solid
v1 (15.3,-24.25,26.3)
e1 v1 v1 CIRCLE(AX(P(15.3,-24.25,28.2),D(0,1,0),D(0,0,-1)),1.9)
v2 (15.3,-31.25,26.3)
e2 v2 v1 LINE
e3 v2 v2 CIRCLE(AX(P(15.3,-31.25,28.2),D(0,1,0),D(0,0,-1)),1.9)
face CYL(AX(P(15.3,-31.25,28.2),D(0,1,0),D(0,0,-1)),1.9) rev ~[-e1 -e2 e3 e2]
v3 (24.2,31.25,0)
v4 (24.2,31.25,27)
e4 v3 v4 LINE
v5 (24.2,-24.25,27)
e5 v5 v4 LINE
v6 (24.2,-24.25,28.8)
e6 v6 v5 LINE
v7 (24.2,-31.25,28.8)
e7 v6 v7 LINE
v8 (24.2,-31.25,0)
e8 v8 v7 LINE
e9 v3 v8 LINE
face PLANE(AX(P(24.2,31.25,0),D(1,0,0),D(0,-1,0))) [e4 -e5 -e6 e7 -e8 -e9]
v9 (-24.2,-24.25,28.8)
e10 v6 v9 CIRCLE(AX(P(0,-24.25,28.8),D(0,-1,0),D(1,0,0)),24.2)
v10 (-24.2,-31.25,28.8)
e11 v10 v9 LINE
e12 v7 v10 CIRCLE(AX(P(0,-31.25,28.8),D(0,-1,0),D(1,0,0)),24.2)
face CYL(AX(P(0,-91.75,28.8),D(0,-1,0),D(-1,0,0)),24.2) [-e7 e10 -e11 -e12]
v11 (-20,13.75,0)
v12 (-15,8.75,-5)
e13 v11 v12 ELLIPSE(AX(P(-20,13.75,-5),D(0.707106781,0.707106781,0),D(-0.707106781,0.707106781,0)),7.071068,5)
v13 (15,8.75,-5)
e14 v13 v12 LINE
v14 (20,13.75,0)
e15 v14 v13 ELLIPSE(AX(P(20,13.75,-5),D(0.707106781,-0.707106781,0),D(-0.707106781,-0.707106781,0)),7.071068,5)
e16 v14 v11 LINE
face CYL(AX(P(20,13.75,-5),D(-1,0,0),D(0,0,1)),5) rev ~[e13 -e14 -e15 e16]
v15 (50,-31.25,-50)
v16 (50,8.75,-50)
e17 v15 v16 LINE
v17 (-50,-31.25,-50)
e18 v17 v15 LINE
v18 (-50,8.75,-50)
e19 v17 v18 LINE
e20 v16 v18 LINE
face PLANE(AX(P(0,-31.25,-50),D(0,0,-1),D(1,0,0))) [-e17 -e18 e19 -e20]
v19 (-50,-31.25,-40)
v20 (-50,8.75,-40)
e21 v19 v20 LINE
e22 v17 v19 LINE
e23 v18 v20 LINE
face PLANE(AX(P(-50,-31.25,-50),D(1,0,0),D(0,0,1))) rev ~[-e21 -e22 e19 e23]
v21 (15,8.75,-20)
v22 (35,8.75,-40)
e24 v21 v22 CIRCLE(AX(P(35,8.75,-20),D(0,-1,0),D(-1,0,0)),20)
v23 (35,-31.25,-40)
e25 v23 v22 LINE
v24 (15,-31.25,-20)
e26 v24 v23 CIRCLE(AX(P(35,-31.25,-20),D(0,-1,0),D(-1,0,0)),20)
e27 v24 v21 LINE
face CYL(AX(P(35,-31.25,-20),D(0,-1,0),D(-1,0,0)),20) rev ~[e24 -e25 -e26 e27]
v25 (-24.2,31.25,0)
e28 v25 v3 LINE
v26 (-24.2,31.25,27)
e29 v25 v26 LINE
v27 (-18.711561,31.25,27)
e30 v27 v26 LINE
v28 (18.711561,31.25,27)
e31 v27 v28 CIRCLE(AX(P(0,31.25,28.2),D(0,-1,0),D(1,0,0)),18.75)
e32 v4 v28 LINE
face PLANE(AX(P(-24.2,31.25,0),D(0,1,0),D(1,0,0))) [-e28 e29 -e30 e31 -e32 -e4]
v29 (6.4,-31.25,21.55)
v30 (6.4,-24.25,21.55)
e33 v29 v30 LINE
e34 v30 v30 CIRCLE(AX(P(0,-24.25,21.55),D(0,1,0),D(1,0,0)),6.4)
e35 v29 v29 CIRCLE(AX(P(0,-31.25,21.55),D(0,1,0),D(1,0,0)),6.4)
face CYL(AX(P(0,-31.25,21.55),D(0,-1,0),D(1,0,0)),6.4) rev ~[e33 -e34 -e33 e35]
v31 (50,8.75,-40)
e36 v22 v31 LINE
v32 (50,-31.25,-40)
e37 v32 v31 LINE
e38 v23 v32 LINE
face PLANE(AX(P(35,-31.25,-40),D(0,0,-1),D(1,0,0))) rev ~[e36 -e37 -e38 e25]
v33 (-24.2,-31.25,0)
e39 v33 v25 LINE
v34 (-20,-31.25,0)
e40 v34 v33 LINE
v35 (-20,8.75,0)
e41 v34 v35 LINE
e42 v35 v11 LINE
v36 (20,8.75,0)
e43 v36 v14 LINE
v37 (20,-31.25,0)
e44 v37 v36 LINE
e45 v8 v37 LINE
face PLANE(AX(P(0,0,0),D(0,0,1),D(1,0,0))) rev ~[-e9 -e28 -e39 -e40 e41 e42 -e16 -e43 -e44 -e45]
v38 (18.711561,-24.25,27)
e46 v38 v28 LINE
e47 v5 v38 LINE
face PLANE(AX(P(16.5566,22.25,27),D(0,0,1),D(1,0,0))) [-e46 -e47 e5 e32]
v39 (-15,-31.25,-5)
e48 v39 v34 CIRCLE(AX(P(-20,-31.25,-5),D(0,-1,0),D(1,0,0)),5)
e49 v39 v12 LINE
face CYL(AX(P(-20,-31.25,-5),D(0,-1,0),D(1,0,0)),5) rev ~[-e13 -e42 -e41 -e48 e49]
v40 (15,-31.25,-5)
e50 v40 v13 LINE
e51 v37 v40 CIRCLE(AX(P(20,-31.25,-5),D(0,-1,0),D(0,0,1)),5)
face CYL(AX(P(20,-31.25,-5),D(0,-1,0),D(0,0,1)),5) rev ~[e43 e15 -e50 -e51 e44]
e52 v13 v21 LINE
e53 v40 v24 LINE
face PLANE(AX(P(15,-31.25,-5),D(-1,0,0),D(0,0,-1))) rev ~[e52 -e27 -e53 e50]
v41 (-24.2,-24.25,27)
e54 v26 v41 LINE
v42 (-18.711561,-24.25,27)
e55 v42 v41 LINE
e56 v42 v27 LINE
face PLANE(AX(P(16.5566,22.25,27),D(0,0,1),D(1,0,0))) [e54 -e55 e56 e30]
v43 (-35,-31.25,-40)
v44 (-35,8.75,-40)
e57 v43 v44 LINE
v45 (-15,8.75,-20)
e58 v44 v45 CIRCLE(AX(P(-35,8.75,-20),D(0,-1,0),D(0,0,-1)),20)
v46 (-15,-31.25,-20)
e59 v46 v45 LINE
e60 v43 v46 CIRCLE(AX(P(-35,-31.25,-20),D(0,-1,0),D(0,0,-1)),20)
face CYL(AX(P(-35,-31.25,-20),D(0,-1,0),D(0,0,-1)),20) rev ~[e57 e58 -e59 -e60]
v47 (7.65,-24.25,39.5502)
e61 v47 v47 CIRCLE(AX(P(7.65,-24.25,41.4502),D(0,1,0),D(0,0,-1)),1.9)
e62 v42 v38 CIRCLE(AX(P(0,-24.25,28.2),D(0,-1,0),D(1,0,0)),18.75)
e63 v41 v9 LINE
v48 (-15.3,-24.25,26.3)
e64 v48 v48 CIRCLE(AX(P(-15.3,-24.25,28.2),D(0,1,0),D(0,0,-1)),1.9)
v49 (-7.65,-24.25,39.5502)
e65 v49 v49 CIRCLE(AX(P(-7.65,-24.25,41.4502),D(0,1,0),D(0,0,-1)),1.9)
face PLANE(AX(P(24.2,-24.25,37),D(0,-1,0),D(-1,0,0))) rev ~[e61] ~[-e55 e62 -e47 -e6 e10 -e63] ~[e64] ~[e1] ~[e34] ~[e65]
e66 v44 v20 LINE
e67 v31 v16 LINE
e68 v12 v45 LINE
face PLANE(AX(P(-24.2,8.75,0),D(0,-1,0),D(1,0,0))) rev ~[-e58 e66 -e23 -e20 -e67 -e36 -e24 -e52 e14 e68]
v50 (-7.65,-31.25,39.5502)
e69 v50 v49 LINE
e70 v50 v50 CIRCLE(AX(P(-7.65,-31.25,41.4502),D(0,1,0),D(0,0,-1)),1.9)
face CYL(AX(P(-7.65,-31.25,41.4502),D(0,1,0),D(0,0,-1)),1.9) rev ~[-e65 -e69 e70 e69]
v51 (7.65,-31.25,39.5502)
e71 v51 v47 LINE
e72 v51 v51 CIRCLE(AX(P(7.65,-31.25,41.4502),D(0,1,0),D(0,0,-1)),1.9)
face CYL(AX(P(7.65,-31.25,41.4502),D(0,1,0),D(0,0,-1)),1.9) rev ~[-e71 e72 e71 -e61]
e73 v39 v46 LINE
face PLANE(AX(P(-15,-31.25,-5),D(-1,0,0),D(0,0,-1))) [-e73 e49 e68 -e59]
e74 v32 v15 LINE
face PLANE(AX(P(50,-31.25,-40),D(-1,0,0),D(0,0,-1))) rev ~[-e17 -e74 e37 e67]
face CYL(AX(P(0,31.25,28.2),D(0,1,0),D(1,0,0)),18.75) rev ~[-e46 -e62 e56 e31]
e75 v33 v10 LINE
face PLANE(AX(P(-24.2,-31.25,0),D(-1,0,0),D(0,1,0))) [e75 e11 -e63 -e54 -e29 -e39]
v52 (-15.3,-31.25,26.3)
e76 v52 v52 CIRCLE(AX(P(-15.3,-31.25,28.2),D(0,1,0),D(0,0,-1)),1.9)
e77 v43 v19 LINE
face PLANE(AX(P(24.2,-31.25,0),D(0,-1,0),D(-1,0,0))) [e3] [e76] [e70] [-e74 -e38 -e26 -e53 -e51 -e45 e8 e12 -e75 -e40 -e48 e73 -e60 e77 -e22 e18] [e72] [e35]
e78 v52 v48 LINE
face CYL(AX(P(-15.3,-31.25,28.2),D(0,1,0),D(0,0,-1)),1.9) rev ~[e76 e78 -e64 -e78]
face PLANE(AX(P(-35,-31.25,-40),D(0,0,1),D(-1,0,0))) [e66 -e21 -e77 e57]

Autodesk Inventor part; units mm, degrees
ref_plane "YZ Plane" through (0, 0, 0) normal (1, 0, 0) x (0, 1, 0)
ref_plane "XZ Plane" through (0, 0, 0) normal (0, 1, 0) x (-1, 0, 0)
ref_plane "XY Plane" through (0, 0, 0) normal (0, 0, 1) x (1, 0, 0)
sketch "Schizzo1" plane through (0, 0, 0) normal (0, 0, 1) x (1, 0, 0)
  line L0 (9, 6) -> (9, -6)
  line L1 (6, -9) -> (-6, -9)
  line L2 (-9, -6) -> (-9, 6)
  line L3 (-6, 9) -> (6, 9)
  arc A0 (-6, 9) -> (-9, 6) centre (-6, 6) ccw
  arc A1 (-9, -6) -> (-6, -9) centre (-6, -6) ccw
  arc A2 (6, -9) -> (9, -6) centre (6, -6) ccw
  arc A3 (9, 6) -> (6, 9) centre (6, 6) ccw
  point P0 (0, 0)
  point P1 (0, 0)
  point P2 (9, 9)
  point P3 (9, -9)
  point P4 (-9, -9)
  point P5 (-9, 9)
  dimension "d0" = 18
  dimension "d72" = 3
extrude "Estrusione1" add sketch "Schizzo1" against normal blind 40
sketch "Schizzo2" plane through (0, 0, 0) normal (0, 0, 1) x (1, 0, 0)
  line L0 (24.2, -31.25) -> (-24.2, -31.25)
  line L1 (-24.2, -31.25) -> (-24.2, 31.25)
  line L2 (-24.2, 31.25) -> (24.2, 31.25)
  line L3 (24.2, 31.25) -> (24.2, -31.25)
  line L4 (24.2, -31.25) -> (-24.2, 31.25) construction
  line L5 (-24.2, -31.25) -> (24.2, 31.25) construction
  point P0 (0, 0)
  dimension "d3" = 62.5
  dimension "d4" = 48.4
extrude "Estrusione2" add sketch "Schizzo2" along normal blind 53
sketch "Schizzo3" plane through (-24.2, 31.25, 0) normal (0, 1, 0) x (1, 0, 0)
  line L0 (24.2, 0) -> (24.2, -28.2)
  line L1 (24.2, 0) -> (52.4, 0) construction
  circle A0 centre (24.2, -28.2) radius 18.75
  dimension "d7" = 28.2
  dimension "d8" = 90
  dimension "d9" = 37.5
extrude "Estrusione3" cut sketch "Schizzo3" against normal blind 55.5
sketch "Schizzo14" plane through (0, 0, 0) normal (0, 0, -1) x (-1, 0, 0)
  line L0 (-11, 13) -> (11, 13)
  line L1 (13, 11) -> (13, -11)
  line L2 (11, -13) -> (-11, -13)
  line L3 (-13, -11) -> (-13, 11)
  arc A0 (11, -13) -> (13, -11) centre (11, -11) ccw
  arc A1 (-13, -11) -> (-11, -13) centre (-11, -11) ccw
  arc A2 (13, 11) -> (11, 13) centre (11, 11) ccw
  arc A3 (-11, 13) -> (-13, 11) centre (-11, 11) ccw
  line L4 (-9.382, 10.5) -> (9.382, 10.5)
  line L5 (10.5, 9.382) -> (10.5, -9.382)
  line L6 (9.382, -10.5) -> (-9.382, -10.5)
  line L7 (-10.5, -9.382) -> (-10.5, 9.382)
  arc A4 (-10.1273, 10.8333) -> (-10.8333, 10.1273) centre (-10.5, 10.5) ccw
  arc A5 (-10.1273, 10.8333) -> (-9.382, 10.5) centre (-9.382, 11.5) ccw
  arc A6 (-10.5, 9.382) -> (-10.8333, 10.1273) centre (-11.5, 9.382) ccw
  arc A7 (10.8333, 10.1273) -> (10.1273, 10.8333) centre (10.5, 10.5) ccw
  arc A8 (9.382, 10.5) -> (10.1273, 10.8333) centre (9.382, 11.5) ccw
  arc A9 (10.8333, 10.1273) -> (10.5, 9.382) centre (11.5, 9.382) ccw
  arc A10 (10.1273, -10.8333) -> (10.8333, -10.1273) centre (10.5, -10.5) ccw
  arc A11 (10.1273, -10.8333) -> (9.382, -10.5) centre (9.382, -11.5) ccw
  arc A12 (10.5, -9.382) -> (10.8333, -10.1273) centre (11.5, -9.382) ccw
  arc A13 (-10.8333, -10.1273) -> (-10.1273, -10.8333) centre (-10.5, -10.5) ccw
  arc A14 (-9.382, -10.5) -> (-10.1273, -10.8333) centre (-9.382, -11.5) ccw
  arc A15 (-10.8333, -10.1273) -> (-10.5, -9.382) centre (-11.5, -9.382) ccw
  point P0 (0, 0)
  point P1 (0, 0)
  point P2 (-10.5, 10.5)
  point P3 (10.5, 10.5)
  point P4 (10.5, -10.5)
  point P5 (-10.5, -10.5)
  point P6 (0, 0)
  point P7 (-13, 13)
  point P8 (13, 13)
  point P9 (13, -13)
  point P10 (-13, -13)
  point P11 (0, 0)
  point P12 (-10, 10.5)
  point P13 (-10.5, 10)
  point P14 (10.5, 10)
  point P15 (10, 10.5)
  point P16 (10, -10.5)
  point P17 (10.5, -10)
  point P18 (-10.5, -10)
  point P19 (-10, -10.5)
  dimension "d77" = 21
  dimension "d78" = 26
  dimension "d102" = 2
  dimension "d110" = 1
  dimension "d112" = 1
  dimension "d114" = 1
  dimension "d116" = 1
extrude "Estrusione10" add sketch "Schizzo14" along normal blind 40
sketch "Schizzo15" plane through (-13, 13, 0) normal (0, 1, 0) x (1, 0, 0)
  line L0 (13, 0) -> (13, 13)
  line L1 (13, 0) -> (26, 0) construction
  dimension "d82" = 13
  dimension "d83" = 90
hole "Foro4" at (0, 13, -13) direction (0, -1, 0) diameter 5.5 depth 26 clearance for "Vite a testa esagonale" size "M5" standard "ANSI - Profilo M Metrico"
sketch "Schizzo16" plane through (13, -11, 0) normal (1, 0, 0) x (0, 0, -1)
  line L0 (0, 11) -> (27, 11)
  line L1 (0, 11) -> (27, 11) construction
  dimension "d91" = 27
  dimension "d92" = 0
hole "Foro5" at (13, 0, -27) direction (-1, 0, 0) diameter 5.5 depth 26 clearance for "Vite a testa esagonale" size "M5" standard "ANSI - Profilo M Metrico"
fillet "Raccordo1" radius 2 1 edges at (0, -13, -40)
fillet "Raccordo2" radius 2 1 edges at (-9, 0, -40)
fillet "Raccordo3" radius 8 1 edges at (-13, 0, 0)
sketch "Schizzo26" plane through (-24.2, -31.25, 0) normal (0, -1, 0) x (1, 0, 0)
  circle A0 centre (24.2, 28.2) radius 18.75 projected
  line L0 (24.2, 46.95) -> (24.2, 27.55)
  line L1 (24.2, 46.95) -> (43.6, 46.95) construction
  line L2 (24.2, 27.55) -> (24.2, 21.55)
  circle A1 centre (24.2, 21.55) radius 6.4
  point P0 (24.2, 0)
  dimension "d159" = 19.4
  dimension "d160" = 90
  dimension "d161" = 6
  dimension "d162" = 180
  dimension "d163" = 12.8
extrude "Estrusione16" cut sketch "Schizzo26" against normal blind 10 contours A1
sketch "Schizzo27" plane through (-24.2, -31.25, 0) normal (0, -1, 0) x (1, 0, 0)
  circle A0 centre (24.2, 28.2) radius 18.75 projected
  line L0 (24.2, 28.2) -> (39.5, 28.2)
  point P0 (24.2, 0)
  point P1 (31.85, 41.4502)
  point P2 (16.55, 41.4502)
  point P3 (8.9, 28.2)
  point P4 (16.55, 14.9498)
  point P5 (31.85, 14.9498)
  dimension "d166" = 15.3
  dimension "d169" = 360
hole "Foro9" at (-15.3, -31.25, 28.2) at (-7.65, -31.25, 41.4502) at (7.65, -31.25, 41.4502) at (15.3, -31.25, 28.2) direction (0, 1, 0) diameter 3.8 depth 8.8 tip angle 118 clearance for "Vite a testa svasata piana ISO 2009/7046" size "M3" standard "ISO"
sketch "Schizzo28" plane through (-24.2, -31.25, 0) normal (-1, 0, 0) x (0, 0, 1)
  line L0 (53, 62.5) -> (53, 0) projected
  line L1 (53, 0) -> (53, 7)
  line L2 (53, 0) -> (60, 0) construction
  line L3 (53, 7) -> (53, 12)
  line L4 (53, 7) -> (53, 12)
  line L5 (53, 12) -> (37, 12)
  line L6 (53, 12) -> (49.5, 12)
  line L7 (53, 12) -> (56.5, 12) construction
  line L8 (53, 12) -> (49, 12)
  line L9 (37, 12) -> (37, 7)
  line L10 (37, 12) -> (42, 12) construction
  line L11 (37, 7) -> (49, 7)
  line L12 (49, 7) -> (49, 12)
  line L13 (49, 12) -> (37, 12)
  line L14 (37, 12) -> (37, 7)
  line L15 (53, 62.5) -> (53, 53.5)
  line L16 (53, 62.5) -> (62, 62.5) construction
  line L17 (53, 62.5) -> (53, 53.5)
  line L18 (53, 53.5) -> (37, 53.5)
  line L19 (37, 53.5) -> (37, 62.5)
  line L20 (37, 62.5) -> (53, 62.5)
  point P0 (0, 31.25)
  dimension "d178" = 7
  dimension "d179" = 90
  dimension "d180" = 5
  dimension "d181" = 180
  dimension "d184" = 180
  dimension "d185" = 4
  dimension "d186" = 5
  dimension "d187" = 90
  dimension "d188" = 9
  dimension "d189" = 90
  dimension "d190" = 16
extrude "Estrusione17" cut sketch "Schizzo28" against normal through all
full round fillet "Raccordo5" first side at (24.2, -6.4167, 12.3333) centre faces at (8.0667, -13.4167, 53) second side at (-24.2, -6.4167, 12.3333)
sketch "Schizzo30" plane through (16.5566, 22.25, 37) normal (0, 0, 1) x (1, 0, 0)
  line L0 (-39.325, 9) -> (-33.1133, 9) projected
  line L1 (0, 9) -> (6.2118, 9) projected
  line L2 (0, -46.5) -> (0, -41.5) projected
  line L3 (-33.1133, -41.5) -> (-33.1133, -46.5) projected
  line L4 (-40.7566, 9) -> (-40.7566, -53.5) projected
  line L5 (6.2118, 9) -> (6.2118, 0) projected
  line L6 (7.6434, -53.5) -> (7.6434, 9) projected
  line L7 (-40.7566, 9) -> (7.6434, 9)
  line L8 (7.6434, 9) -> (7.6434, -46.5)
  line L9 (7.6434, -46.5) -> (-40.7566, -46.5)
  line L10 (-40.7566, -46.5) -> (-40.7566, 9)
  point P0 (-16.5566, -22.25)
  point P1 (-40.7566, -46.5)
  point P2 (7.6434, 9)
  point P3 (-33.1133, 9)
extrude "Estrusione19" cut sketch "Schizzo30" along normal blind 20 and the other way blind 10
sketch "Schizzo31" plane through (0, 0, 0) normal (0, 0, -1) x (-1, 0, 0)
  line L0 (24.2, 31.25) -> (24.2, -31.25) projected
  line L1 (-24.2, -26.25) -> (24.2, -26.25)
  line L2 (24.2, -26.25) -> (24.2, 26.25)
  line L3 (24.2, 26.25) -> (-24.2, 26.25)
  line L4 (-24.2, 26.25) -> (-24.2, -26.25)
  point P0 (0, 0)
  point P1 (24.2, -26.25)
extrude "Estrusione20" cut sketch "Schizzo31" along normal up to surface (40 mm away)
sketch "Schizzo32" plane through (-24.2, -31.25, 0) normal (0, -1, 0) x (1, 0, 0)
  line L0 (24.2, 0) -> (24.2, -50)
  line L1 (24.2, -50) -> (-25.8, -50)
  line L2 (24.2, -50) -> (74.2, -50)
  line L3 (39.2, 0) -> (9.2, 0)
  line L4 (0, 0) -> (48.4, 0) projected
  line L5 (-25.8, -50) -> (-25.8, -40)
  line L6 (74.2, -50) -> (-25.8, -50)
  line L7 (-25.8, -50) -> (-25.8, -40)
  line L8 (59.2, -40) -> (74.2, -40)
  line L9 (74.2, -40) -> (74.2, -50)
  line L10 (9.2, -5) -> (9.2, -20)
  line L11 (39.2, -5) -> (39.2, -20)
  arc A0 (39.2, -20) -> (59.2, -40) centre (59.2, -20) ccw
  line L12 (-10.8, -40) -> (-25.8, -40)
  arc A1 (-10.8, -40) -> (9.2, -20) centre (-10.8, -20) ccw
  line L13 (4.2, 0) -> (0, 0)
  line L14 (48.4, 0) -> (48.4, 28.8) projected
  line L15 (48.4, 0) -> (44.2, 0)
  arc A2 (44.2, 0) -> (39.2, -5) centre (44.2, -5) ccw
  arc A3 (9.2, -5) -> (4.2, 0) centre (4.2, -5) ccw
  point P0 (24.2, 0)
  point P1 (9.2, -40)
  point P2 (9.2, 0)
  point P3 (4.2, 0)
  dimension "d205" = 50
  dimension "d206" = 50
  dimension "d207" = 50
  dimension "d208" = 30
  dimension "d209" = 10
  dimension "d210" = 20
  dimension "d211" = 20
  dimension "d212" = 5
  dimension "d213" = 5
extrude "Estrusione21" add sketch "Schizzo32" against normal blind 40
fillet "Raccordo6" radius 5 1 edges at (0, 8.75, 0)
properties part number "5_Connettore_sup_inf" material "PLA(Stampato)"
